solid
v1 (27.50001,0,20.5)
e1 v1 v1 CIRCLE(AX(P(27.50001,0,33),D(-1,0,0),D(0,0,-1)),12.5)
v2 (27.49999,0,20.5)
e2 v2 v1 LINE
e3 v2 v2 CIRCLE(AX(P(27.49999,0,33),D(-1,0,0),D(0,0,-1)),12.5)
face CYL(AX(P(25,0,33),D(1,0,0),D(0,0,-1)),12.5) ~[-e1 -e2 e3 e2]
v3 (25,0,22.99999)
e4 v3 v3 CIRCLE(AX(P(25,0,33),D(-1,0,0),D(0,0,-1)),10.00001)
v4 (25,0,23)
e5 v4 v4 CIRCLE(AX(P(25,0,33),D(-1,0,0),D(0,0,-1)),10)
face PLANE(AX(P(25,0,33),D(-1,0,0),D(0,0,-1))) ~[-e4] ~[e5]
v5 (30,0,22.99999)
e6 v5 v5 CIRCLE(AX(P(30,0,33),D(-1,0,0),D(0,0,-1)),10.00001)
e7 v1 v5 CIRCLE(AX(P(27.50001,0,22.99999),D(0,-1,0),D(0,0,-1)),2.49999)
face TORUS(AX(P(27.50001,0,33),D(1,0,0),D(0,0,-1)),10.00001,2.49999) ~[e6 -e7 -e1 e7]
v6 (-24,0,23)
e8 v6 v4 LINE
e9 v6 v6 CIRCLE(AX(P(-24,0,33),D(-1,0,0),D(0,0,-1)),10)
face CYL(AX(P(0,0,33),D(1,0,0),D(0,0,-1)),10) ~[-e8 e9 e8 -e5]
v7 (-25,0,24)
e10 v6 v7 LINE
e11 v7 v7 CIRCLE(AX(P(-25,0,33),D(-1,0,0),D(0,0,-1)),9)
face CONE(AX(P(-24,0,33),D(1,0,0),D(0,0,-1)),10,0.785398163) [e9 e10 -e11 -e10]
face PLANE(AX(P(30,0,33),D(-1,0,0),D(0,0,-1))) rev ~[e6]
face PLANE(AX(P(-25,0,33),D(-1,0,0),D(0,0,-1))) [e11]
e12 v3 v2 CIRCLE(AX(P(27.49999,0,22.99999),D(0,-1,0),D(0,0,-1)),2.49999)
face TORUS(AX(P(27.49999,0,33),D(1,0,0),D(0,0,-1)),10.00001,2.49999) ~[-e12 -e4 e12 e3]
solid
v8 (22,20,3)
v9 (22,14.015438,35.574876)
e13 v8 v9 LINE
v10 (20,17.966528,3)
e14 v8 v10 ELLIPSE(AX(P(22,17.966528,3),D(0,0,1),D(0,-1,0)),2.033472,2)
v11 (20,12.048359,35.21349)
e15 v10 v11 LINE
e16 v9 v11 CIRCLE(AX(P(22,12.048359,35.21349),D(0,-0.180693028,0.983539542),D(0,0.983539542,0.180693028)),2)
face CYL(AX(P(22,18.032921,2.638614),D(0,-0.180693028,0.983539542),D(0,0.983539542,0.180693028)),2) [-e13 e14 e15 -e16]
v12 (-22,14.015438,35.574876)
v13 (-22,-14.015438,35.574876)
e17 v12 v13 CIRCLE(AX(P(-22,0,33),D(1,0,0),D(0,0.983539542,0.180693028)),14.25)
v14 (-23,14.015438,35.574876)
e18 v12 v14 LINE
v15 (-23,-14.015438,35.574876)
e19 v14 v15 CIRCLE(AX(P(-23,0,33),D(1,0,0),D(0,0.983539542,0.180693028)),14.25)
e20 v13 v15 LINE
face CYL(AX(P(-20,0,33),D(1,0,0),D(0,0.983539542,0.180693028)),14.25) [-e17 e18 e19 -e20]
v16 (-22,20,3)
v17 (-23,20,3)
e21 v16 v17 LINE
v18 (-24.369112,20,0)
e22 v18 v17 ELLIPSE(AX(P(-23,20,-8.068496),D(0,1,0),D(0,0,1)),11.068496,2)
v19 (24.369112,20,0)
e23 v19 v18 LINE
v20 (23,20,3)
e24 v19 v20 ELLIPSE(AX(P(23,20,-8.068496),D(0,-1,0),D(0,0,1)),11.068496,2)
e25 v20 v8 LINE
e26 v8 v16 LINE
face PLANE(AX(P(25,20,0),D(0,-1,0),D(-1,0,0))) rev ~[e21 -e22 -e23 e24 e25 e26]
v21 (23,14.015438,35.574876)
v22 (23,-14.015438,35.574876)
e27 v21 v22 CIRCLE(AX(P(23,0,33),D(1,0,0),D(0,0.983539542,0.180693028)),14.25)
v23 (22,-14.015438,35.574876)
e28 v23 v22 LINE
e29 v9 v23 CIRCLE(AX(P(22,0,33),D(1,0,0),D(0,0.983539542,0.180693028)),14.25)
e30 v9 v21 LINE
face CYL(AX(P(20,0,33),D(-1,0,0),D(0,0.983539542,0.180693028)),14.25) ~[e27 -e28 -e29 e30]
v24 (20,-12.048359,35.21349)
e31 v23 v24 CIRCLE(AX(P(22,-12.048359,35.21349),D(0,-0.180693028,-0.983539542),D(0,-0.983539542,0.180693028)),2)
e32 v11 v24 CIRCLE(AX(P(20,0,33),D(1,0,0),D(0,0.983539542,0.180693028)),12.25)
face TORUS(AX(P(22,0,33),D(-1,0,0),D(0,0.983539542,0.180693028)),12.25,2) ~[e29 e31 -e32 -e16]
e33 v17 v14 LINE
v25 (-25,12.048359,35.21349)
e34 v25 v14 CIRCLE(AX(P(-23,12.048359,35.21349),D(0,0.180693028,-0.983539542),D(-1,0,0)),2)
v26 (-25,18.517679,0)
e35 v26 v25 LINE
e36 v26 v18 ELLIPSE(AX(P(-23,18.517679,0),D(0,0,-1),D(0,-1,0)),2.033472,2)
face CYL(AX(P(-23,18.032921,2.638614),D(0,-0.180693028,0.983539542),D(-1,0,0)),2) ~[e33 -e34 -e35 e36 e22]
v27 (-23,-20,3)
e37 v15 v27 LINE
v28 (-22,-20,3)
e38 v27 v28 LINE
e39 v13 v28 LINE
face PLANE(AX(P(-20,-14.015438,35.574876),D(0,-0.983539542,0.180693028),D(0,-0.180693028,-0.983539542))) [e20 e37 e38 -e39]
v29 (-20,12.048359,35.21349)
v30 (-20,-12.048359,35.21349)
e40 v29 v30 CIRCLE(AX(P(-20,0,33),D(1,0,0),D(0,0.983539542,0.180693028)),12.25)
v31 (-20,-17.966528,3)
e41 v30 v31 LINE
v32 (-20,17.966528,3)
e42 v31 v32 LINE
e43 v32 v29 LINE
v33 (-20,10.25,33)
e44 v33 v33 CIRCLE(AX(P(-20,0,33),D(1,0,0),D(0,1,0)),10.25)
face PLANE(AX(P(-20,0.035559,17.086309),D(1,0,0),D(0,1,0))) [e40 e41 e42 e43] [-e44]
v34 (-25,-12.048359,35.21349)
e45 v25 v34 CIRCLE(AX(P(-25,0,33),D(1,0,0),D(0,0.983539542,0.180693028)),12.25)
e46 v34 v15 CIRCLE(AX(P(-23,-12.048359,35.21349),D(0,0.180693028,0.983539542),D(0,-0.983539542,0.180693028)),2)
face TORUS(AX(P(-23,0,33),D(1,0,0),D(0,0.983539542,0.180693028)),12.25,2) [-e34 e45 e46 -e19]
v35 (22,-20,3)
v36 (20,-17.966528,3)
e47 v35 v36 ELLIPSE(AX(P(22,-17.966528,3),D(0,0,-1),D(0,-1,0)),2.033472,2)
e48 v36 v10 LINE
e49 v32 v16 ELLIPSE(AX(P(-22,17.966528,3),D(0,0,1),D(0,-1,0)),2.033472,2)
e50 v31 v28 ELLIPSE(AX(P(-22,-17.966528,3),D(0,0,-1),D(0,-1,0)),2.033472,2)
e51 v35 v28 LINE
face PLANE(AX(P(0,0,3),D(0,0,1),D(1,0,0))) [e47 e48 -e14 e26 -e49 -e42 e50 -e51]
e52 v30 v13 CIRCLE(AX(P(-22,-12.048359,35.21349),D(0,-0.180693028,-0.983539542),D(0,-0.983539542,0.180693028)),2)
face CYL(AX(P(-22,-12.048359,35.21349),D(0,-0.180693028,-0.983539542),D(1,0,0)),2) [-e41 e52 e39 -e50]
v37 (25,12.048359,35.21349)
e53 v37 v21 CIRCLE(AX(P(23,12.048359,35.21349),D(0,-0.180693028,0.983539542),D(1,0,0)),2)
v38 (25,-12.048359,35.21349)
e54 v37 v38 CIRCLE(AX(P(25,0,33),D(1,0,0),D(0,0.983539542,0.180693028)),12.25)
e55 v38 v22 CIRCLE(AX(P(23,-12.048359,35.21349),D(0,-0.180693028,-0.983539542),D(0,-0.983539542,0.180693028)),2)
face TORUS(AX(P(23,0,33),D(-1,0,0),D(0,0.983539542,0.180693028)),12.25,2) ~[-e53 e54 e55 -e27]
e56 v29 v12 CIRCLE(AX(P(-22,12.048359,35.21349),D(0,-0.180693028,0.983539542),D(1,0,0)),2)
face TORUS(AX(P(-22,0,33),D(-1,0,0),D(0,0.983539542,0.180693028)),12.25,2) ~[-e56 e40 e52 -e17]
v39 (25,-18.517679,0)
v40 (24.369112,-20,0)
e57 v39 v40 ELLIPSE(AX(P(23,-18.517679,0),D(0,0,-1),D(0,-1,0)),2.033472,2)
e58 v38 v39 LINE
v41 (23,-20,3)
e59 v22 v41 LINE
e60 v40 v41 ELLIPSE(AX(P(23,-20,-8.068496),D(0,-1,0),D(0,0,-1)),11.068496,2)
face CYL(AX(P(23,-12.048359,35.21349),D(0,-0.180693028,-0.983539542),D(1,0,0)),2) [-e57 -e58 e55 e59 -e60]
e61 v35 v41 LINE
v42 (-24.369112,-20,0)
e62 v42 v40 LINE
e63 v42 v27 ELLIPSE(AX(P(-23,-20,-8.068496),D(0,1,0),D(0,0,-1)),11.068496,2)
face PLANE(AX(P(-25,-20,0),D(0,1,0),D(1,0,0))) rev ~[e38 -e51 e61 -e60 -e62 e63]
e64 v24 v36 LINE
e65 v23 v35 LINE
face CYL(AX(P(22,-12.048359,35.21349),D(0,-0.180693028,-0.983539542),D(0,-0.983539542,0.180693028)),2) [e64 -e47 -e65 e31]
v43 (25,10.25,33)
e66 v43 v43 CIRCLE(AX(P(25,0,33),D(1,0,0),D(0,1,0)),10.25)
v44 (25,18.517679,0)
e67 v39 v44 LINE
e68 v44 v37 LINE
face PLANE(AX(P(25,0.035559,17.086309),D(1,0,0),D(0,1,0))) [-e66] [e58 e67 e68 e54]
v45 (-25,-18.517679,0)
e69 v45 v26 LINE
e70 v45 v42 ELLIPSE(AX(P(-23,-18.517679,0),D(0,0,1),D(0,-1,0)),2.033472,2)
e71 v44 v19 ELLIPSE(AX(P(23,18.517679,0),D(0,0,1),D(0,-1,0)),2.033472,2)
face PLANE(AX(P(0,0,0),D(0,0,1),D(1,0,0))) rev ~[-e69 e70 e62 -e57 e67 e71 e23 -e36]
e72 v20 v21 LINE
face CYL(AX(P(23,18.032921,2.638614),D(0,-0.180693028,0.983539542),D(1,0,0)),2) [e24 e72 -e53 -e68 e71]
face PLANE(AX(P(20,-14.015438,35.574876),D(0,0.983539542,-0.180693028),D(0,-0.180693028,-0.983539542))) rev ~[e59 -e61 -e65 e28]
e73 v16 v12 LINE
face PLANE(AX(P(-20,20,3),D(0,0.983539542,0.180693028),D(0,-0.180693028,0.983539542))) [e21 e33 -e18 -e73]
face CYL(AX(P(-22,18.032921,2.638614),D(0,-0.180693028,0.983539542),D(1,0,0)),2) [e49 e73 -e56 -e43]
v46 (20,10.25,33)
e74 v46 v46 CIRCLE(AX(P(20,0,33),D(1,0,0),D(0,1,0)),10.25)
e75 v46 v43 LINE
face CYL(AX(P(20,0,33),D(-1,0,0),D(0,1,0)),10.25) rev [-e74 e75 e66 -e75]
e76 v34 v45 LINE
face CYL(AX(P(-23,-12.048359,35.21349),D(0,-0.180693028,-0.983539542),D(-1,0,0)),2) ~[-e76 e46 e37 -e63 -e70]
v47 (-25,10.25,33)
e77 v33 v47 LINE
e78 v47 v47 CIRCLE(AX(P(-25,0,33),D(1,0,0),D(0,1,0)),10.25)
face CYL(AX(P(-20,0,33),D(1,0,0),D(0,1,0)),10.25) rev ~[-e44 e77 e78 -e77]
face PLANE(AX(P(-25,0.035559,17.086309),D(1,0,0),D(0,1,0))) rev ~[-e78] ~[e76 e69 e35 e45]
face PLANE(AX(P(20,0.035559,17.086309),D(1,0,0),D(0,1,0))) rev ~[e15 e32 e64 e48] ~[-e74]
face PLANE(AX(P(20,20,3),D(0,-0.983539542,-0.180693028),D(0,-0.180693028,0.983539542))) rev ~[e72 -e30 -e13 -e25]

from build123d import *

# Parameters (mm, degrees)
F0_W     = 40
F0_H     = 40
F0_W_2   = 5
F1_DEPTH = 3
F3_START = 20
F2_R     = 10.25
F3_DEPTH = 5
F4_START = -20
F4_DEPTH = 5
F5_W     = 50
F5_H     = 10
F7_R     = 2
F8_R     = 2.49999
F9_SIZE  = 1


# Not quite as in the source:
# - a fillet or chamfer is up to 0.001 mm smaller than in the source, because OpenCascade refuses the exact size


with BuildPart() as f1:
    # F0 (on Top) → F1 (new body)
    with BuildSketch(Plane.XY):
        Rectangle(F0_W, F0_H)
        with Locations((-22.5, 0)):
            Rectangle(F0_W_2, F0_H)
        with Locations((22.5, 0)):
            Rectangle(F0_W_2, F0_H)
    extrude(amount=F1_DEPTH)

    # F2 (on Right) → F3 (join)
    with BuildSketch(Plane.YZ.offset(F3_START)):
        with BuildLine():
            ThreePointArc((14.0154384668, 35.5748756445), (14.1912384617, 34.2927687049), (14.25, 33))
            ThreePointArc((14.25, 33), (-1.2927687049, 18.8087615383), (-14.0154384668, 35.5748756445))
            Line((-14.0154384668, 35.5748756445), (-20, 3))
            Line((-20, 3), (20, 3))
            Line((20, 3), (14.0154384668, 35.5748756445))
        make_face()
        with BuildLine():
            ThreePointArc((-14.0154384668, 35.5748756445), (-1.2927687049, 18.8087615383), (14.25, 33))
            ThreePointArc((14.25, 33), (14.1912384617, 34.2927687049), (14.0154384668, 35.5748756445))
            ThreePointArc((14.0154384668, 35.5748756445), (0, 47.25), (-14.0154384668, 35.5748756445))
        make_face()
        with Locations((0, 33)):
            Circle(F2_R, mode=Mode.SUBTRACT)
    extrude(amount=F3_DEPTH)

    # F2 (on Right) → F4 (join)
    with BuildSketch(Plane.YZ.offset(F4_START)):
        with BuildLine():
            ThreePointArc((14.0154384668, 35.5748756445), (14.1912384617, 34.2927687049), (14.25, 33))
            ThreePointArc((14.25, 33), (-1.2927687049, 18.8087615383), (-14.0154384668, 35.5748756445))
            Line((-14.0154384668, 35.5748756445), (-20, 3))
            Line((-20, 3), (20, 3))
            Line((20, 3), (14.0154384668, 35.5748756445))
        make_face()
        with BuildLine():
            ThreePointArc((-14.0154384668, 35.5748756445), (-1.2927687049, 18.8087615383), (14.25, 33))
            ThreePointArc((14.25, 33), (14.1912384617, 34.2927687049), (14.0154384668, 35.5748756445))
            ThreePointArc((14.0154384668, 35.5748756445), (0, 47.25), (-14.0154384668, 35.5748756445))
        make_face()
        with Locations((0, 33)):
            Circle(F2_R, mode=Mode.SUBTRACT)
    extrude(amount=-F4_DEPTH)

    # F7
    f7_edges = [f1.edges().sort_by_distance(p)[0] for p in [
        (-20, 17.007719, 19.287438),
        (-25, 17.007719, 19.287438),
        (20, 17.007719, 19.287438),
        (25, 17.007719, 19.287438),
    ]]
    fillet(f7_edges, radius=F7_R)


with BuildPart() as f6:
    # F5 (on Front) → F6 (revolve)
    with BuildSketch(Plane.XZ):
        with Locations((0, 28)):
            Rectangle(F5_W, F5_H)
        Polygon((25, 33), (25, 23), (25, 20.5), (30, 20.5), (30, 33), align=None)
    revolve(axis=Axis((0, 0, 33), (-1, 0, 0)))

    # F8 (radius 2.5 in the source; OpenCascade refuses exactly that, so slightly less here)
    f8_edges = [f6.edges().sort_by_distance(p)[0] for p in [
        (30, 0, 45.5),
        (25, 0, 45.5),
    ]]
    fillet(f8_edges, radius=F8_R)

    # F9
    f9_edges = [f6.edges().sort_by_distance(p)[0] for p in [
        (-25, 0, 43),
    ]]
    chamfer(f9_edges, length=F9_SIZE)


solid = Compound([f1.part, f6.part])
